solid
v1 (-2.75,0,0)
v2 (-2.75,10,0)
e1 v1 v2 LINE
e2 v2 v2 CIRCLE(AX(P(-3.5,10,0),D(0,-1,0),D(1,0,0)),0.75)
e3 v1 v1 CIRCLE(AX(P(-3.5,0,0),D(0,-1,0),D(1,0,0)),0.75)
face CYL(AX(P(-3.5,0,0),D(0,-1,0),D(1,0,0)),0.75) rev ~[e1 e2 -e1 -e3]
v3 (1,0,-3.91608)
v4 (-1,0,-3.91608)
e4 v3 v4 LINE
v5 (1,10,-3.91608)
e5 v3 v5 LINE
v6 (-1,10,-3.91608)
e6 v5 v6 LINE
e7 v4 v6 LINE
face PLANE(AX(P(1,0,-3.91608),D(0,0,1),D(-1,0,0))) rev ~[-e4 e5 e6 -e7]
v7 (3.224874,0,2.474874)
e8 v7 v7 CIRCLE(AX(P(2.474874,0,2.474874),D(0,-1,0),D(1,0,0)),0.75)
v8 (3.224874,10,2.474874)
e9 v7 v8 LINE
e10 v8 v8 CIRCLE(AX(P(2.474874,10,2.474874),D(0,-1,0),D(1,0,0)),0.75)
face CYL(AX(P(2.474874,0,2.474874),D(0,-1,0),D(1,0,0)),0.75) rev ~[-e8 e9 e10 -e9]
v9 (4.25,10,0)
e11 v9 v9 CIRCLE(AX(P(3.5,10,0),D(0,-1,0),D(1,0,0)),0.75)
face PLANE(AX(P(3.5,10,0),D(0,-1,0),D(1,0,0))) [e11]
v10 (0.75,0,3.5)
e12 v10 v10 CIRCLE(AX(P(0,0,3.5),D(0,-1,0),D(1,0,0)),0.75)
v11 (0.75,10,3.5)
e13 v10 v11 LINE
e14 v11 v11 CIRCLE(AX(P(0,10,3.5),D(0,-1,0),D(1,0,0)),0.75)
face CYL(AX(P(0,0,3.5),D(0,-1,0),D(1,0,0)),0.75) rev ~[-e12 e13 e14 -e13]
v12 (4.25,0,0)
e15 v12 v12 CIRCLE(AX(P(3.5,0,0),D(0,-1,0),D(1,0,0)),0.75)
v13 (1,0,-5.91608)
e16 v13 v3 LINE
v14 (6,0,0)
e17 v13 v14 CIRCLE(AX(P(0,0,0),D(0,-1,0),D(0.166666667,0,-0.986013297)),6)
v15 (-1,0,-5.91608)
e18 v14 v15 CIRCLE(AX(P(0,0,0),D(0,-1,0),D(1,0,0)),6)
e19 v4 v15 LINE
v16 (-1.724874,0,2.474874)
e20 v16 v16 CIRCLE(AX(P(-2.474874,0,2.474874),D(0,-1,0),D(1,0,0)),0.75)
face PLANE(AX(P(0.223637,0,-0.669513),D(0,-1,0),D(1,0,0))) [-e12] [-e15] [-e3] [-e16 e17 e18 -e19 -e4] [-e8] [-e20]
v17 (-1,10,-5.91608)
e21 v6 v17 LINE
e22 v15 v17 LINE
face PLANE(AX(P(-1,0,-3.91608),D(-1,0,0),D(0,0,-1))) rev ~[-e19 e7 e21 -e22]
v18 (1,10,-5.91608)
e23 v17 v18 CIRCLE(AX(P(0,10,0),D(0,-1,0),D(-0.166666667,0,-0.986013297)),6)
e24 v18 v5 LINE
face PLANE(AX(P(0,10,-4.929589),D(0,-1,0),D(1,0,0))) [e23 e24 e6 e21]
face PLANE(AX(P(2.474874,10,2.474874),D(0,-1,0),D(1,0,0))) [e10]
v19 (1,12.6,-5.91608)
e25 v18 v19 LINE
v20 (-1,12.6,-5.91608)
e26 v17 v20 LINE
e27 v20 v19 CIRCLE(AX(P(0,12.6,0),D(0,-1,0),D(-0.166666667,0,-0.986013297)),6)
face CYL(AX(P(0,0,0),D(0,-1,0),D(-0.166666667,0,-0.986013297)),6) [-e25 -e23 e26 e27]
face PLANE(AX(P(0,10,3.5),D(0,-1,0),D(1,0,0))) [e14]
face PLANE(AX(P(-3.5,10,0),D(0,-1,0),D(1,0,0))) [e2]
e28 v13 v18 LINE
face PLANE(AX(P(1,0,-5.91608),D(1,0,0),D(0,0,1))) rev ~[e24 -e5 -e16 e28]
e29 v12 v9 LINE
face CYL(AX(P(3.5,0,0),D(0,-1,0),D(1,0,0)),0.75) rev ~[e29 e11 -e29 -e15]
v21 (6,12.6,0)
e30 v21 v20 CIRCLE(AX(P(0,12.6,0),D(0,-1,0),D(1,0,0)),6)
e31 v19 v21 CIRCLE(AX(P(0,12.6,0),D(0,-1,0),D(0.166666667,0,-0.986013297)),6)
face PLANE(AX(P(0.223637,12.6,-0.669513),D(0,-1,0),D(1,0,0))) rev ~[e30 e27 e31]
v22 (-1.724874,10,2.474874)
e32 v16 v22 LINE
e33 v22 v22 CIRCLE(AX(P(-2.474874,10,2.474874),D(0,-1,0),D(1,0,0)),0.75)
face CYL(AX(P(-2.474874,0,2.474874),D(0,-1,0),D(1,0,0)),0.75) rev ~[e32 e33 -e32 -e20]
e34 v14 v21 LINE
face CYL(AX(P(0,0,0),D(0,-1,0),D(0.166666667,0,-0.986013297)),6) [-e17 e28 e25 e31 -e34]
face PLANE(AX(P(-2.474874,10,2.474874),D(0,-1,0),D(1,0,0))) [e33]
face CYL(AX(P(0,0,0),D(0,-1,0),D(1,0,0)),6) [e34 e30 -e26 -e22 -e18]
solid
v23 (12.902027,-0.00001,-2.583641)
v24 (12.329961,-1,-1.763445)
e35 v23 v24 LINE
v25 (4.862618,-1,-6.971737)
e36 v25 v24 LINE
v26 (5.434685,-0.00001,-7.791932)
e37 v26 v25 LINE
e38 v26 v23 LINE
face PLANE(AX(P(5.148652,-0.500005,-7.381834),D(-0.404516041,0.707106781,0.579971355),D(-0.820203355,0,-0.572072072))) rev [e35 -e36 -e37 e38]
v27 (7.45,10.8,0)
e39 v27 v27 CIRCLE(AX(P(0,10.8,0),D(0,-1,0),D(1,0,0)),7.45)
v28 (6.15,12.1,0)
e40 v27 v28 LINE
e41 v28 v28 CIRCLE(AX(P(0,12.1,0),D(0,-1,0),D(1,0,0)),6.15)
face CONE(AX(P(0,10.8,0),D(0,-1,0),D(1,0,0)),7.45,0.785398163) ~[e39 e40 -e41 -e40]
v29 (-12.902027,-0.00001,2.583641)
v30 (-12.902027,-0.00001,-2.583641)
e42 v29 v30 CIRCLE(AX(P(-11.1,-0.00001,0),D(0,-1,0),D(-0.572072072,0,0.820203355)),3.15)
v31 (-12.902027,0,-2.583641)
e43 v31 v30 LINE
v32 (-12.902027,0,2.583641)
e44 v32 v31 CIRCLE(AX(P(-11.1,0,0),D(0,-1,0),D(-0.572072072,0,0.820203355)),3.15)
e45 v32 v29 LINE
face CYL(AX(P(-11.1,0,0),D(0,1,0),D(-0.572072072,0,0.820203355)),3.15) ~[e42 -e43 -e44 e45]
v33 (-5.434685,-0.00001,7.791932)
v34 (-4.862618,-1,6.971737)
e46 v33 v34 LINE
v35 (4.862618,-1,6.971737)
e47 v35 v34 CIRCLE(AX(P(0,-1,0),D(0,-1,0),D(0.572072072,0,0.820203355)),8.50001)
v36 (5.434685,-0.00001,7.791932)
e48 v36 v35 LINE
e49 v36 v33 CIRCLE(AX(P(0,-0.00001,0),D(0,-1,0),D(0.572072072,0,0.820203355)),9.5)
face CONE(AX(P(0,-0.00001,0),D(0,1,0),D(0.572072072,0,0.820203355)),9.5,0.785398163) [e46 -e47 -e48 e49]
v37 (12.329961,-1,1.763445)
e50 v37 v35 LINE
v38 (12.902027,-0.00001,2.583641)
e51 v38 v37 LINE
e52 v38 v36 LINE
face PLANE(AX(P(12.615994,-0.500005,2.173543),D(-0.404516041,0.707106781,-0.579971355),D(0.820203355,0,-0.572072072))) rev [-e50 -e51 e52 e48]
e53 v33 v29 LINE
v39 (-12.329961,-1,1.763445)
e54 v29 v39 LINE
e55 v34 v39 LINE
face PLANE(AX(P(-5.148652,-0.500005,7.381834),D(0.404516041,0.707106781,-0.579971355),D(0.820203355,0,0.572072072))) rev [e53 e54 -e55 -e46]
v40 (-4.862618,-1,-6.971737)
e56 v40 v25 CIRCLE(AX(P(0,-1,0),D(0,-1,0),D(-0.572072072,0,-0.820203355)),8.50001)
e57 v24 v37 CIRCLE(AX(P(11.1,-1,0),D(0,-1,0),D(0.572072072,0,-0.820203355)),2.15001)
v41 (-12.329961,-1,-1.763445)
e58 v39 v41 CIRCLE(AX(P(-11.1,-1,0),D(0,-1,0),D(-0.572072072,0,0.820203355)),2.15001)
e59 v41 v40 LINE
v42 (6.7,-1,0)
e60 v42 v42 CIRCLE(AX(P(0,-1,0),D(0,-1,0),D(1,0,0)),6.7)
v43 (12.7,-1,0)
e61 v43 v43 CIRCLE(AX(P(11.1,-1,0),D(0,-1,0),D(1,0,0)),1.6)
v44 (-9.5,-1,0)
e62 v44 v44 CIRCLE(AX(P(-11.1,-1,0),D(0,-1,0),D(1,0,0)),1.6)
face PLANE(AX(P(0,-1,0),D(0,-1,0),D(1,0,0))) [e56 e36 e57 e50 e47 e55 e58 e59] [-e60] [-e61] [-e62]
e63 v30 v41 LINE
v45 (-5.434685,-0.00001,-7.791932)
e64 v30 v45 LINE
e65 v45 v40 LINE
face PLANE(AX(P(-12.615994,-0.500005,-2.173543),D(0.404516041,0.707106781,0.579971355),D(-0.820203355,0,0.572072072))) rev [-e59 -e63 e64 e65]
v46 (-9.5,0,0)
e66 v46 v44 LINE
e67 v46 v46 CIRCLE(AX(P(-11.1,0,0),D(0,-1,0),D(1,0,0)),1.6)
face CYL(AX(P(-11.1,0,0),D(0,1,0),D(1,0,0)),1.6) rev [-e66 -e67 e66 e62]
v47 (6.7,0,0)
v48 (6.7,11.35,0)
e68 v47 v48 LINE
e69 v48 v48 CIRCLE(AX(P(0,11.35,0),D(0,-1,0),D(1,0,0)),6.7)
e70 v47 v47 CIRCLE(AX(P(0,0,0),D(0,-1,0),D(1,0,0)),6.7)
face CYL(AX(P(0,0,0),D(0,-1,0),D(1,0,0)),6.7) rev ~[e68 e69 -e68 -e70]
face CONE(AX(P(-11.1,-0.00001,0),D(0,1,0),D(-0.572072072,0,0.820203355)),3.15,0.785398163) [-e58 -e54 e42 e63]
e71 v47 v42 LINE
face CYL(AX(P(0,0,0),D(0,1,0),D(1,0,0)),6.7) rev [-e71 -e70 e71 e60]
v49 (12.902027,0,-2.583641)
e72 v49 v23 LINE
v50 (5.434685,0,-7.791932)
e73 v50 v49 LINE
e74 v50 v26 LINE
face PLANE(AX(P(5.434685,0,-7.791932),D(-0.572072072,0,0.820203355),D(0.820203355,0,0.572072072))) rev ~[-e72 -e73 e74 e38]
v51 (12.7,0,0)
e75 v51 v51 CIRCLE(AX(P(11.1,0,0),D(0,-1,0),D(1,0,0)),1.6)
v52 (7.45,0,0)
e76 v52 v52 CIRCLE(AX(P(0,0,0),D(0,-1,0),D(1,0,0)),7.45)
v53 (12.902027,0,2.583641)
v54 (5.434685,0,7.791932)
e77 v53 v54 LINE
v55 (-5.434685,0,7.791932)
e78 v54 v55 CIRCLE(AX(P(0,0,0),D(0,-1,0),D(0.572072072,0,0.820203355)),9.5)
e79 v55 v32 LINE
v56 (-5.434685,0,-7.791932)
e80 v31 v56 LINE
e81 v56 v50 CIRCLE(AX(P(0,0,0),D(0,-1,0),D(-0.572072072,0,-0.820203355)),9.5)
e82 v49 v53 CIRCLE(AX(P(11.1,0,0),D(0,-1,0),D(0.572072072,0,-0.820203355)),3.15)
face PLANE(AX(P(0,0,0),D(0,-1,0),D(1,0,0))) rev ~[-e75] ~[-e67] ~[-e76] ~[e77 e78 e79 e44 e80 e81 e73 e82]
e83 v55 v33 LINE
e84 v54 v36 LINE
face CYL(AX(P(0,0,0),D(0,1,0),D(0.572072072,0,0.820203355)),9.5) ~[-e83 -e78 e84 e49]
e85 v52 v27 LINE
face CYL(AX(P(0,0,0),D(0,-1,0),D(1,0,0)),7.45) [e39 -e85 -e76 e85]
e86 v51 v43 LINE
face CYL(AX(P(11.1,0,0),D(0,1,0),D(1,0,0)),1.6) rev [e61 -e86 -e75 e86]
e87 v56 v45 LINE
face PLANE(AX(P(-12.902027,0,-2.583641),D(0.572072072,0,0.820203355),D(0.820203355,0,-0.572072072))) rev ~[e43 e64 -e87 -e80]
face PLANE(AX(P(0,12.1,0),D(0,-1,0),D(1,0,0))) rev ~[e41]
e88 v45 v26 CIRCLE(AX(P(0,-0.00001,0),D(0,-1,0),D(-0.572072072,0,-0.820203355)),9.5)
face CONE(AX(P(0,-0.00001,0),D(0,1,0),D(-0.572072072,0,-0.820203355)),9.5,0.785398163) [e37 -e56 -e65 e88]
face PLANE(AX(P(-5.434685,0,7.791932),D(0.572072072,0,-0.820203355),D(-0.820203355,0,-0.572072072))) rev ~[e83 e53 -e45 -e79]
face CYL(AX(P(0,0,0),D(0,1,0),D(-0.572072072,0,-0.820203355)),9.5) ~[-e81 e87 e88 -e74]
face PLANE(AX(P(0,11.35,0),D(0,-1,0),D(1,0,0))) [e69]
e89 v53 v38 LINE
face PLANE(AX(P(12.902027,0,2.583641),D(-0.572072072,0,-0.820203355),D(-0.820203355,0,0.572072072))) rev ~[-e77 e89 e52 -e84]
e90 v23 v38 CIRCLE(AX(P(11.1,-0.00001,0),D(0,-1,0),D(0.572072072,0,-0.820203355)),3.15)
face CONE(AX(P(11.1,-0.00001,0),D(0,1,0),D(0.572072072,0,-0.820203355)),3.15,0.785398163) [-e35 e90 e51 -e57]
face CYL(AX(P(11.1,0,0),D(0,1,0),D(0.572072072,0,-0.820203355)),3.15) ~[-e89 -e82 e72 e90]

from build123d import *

# Parameters (mm, degrees)
F0_R     = 1.6
F0_R_2   = 7.45
F0_R_3   = 6.7
F1_DEPTH = 1
F2_SIZE  = 0.99999
F0_R_4   = 0.75
F3_DEPTH = 12.1
F4_T     = 0.75
F5_DEPTH = 12.6
F6_DEPTH = 10
F7_SIZE  = 1.3


# Not quite as in the source:
# - a fillet or chamfer is up to 0.001 mm smaller than in the source, because OpenCascade refuses the exact size
# - a shell that OpenCascade refuses in one call is made with other operations: the cavity is built on its own and cut out


with BuildPart() as f1:
    # F0 (on Front) → F1 (new body)
    with BuildSketch(Plane.XZ):
        with BuildLine():
            Line((-5.4346846847, 7.7919318771), (-12.902027027, 2.5836405698))
            ThreePointArc((-12.902027027, 2.5836405698), (-14.25, 0), (-12.902027027, -2.5836405698))
            Line((-12.902027027, -2.5836405698), (-5.4346846847, -7.7919318771))
            ThreePointArc((-5.4346846847, -7.7919318771), (0, -9.5), (5.4346846847, -7.7919318771))
            Line((5.4346846847, -7.7919318771), (12.902027027, -2.5836405698))
            ThreePointArc((12.902027027, -2.5836405698), (14.25, 0), (12.902027027, 2.5836405698))
            Line((12.902027027, 2.5836405698), (5.4346846847, 7.7919318771))
            ThreePointArc((5.4346846847, 7.7919318771), (0, 9.5), (-5.4346846847, 7.7919318771))
        make_face()
        with Locations((-11.1, 0)):
            Circle(F0_R, mode=Mode.SUBTRACT)
        Circle(F0_R_2, mode=Mode.SUBTRACT)
        with Locations((11.1, 0)):
            Circle(F0_R, mode=Mode.SUBTRACT)
        Circle(F0_R_2)
        Circle(F0_R_3, mode=Mode.SUBTRACT)
    extrude(amount=F1_DEPTH)

    # F2 (size 1 in the source; OpenCascade refuses exactly that, so slightly less here)
    f2_edges = [f1.edges().sort_by_distance(p)[0] for p in [
        (-9.168356, -1, 5.187786),
        (0, -1, 9.5),
        (-14.25, -1, 0),
        (-9.168356, -1, -5.187786),
        (0, -1, -9.5),
        (9.168356, -1, -5.187786),
        (14.25, -1, 0),
        (9.168356, -1, 5.187786),
    ]]
    chamfer(f2_edges, length=F2_SIZE)

    # F0 (on Front) → F3 (join)
    with BuildSketch(Plane.XZ):
        Circle(F0_R_2)
        Circle(F0_R_3, mode=Mode.SUBTRACT)
        Circle(F0_R_3)
        with BuildLine():
            ThreePointArc((-1, -5.9160797831), (-3.8729833462, 4.582575695), (6, 0))
            ThreePointArc((6, 0), (4.582575695, -3.8729833462), (1, -5.9160797831))
            Line((1, -5.9160797831), (1, -6.3300160691))
            Line((1, -6.3300160691), (-1, -6.3300160691))
            Line((-1, -6.3300160691), (-1, -5.9160797831))
        make_face(mode=Mode.SUBTRACT)
        with BuildLine():
            ThreePointArc((1, -5.9160797831), (4.582575695, -3.8729833462), (6, 0))
            ThreePointArc((6, 0), (-3.8729833462, 4.582575695), (-1, -5.9160797831))
            Line((-1, -5.9160797831), (-1, -3.9160797831))
            Line((-1, -3.9160797831), (0, -3.9160797831))
            Line((0, -3.9160797831), (1, -3.9160797831))
            Line((1, -3.9160797831), (1, -5.9160797831))
        make_face()
        with Locations((-3.5, 0)):
            Circle(F0_R_4, mode=Mode.SUBTRACT)
        with Locations((-2.4748737342, 2.4748737342)):
            Circle(F0_R_4, mode=Mode.SUBTRACT)
        with Locations((3.5, 0)):
            Circle(F0_R_4, mode=Mode.SUBTRACT)
        with Locations((0, 3.5)):
            Circle(F0_R_4, mode=Mode.SUBTRACT)
        with Locations((2.4748737342, 2.4748737342)):
            Circle(F0_R_4, mode=Mode.SUBTRACT)
        with Locations((-3.5, 0)):
            Circle(F0_R_4)
        with Locations((-2.4748737342, 2.4748737342)):
            Circle(F0_R_4)
        with Locations((0, 3.5)):
            Circle(F0_R_4)
        with Locations((2.4748737342, 2.4748737342)):
            Circle(F0_R_4)
        with Locations((3.5, 0)):
            Circle(F0_R_4)
        with BuildLine():
            Line((-1, -3.9160797831), (-1, -5.9160797831))
            ThreePointArc((-1, -5.9160797831), (0, -6), (1, -5.9160797831))
            Line((1, -5.9160797831), (1, -3.9160797831))
            Line((1, -3.9160797831), (0, -3.9160797831))
            Line((0, -3.9160797831), (-1, -3.9160797831))
        make_face()
        with BuildLine():
            ThreePointArc((1, -5.9160797831), (0, -6), (-1, -5.9160797831))
            Line((-1, -5.9160797831), (-1, -6.3300160691))
            Line((-1, -6.3300160691), (1, -6.3300160691))
            Line((1, -6.3300160691), (1, -5.9160797831))
        make_face()
    extrude(amount=-F3_DEPTH)

    # F4: shell of thickness 0.75, made by hand


with BuildPart() as f4_core1:
    # F4_t2: copy of F1
    add(f1.part)

    # the walls: a layer under each face that stays
    f4_faces = [f4_core1.faces().sort_by_distance(p)[0] for p in [
        (0, -5e-06, 9.5),
        (9.1683558559, -5e-06, 5.1877862235),
        (0, -0.500005, 9.000005),
        (-12.2142857143, 0, -2.7142857143),
        (-9.1683558559, -5e-06, 5.1877862235),
        (14.25, -5e-06, 0),
        (8.8823226802, -0.500005, 4.7776886467),
        (-8.83334, -1, 0),
        (-8.8823226802, -0.500005, 4.7776886467),
        (-14.25, -5e-06, 0),
        (9.1683558559, -5e-06, -5.1877862235),
        (-9.1683558559, -5e-06, -5.1877862235),
        (0, -5e-06, -9.5),
        (-12.7, -0.5, 0),
        (-7.45, 6.05, 0),
        (9.5, -0.5, 0),
        (13.750005, -0.500005, 0),
        (-13.750005, -0.500005, 0),
        (-8.8823226802, -0.500005, -4.7776886467),
        (0, -0.500005, -9.000005),
        (8.8823226802, -0.500005, -4.7776886467),
        (-6.7, -0.5, 0),
        (0, 12.1, 0),
    ]]
    thicken(f4_faces, amount=-F4_T, mode=Mode.SUBTRACT)

    # F4_s3 → F4_t4 (revolve, cut)
    with BuildSketch(Plane.XY):
        Polygon((7.4575, 0.0075), (7.45, -0.75), (6.7, -0.75), (6.7, 0), align=None)
    revolve(axis=Axis((0, 0, 0), (0, -1, 0)), mode=Mode.SUBTRACT)


with BuildPart() as f1_1:
    add(f1.part)

    # what is left inside the walls is the cavity
    f4_cavity = [f4_core1.part.solids().sort_by_distance(p)[0] for p in [
        (-6.6925, 7.566667, 0),
    ]]
    add(f4_cavity, mode=Mode.SUBTRACT)

    # F7
    f7_edges = [f1_1.edges().sort_by_distance(p)[0] for p in [
        (-7.45, 12.1, 0),
    ]]
    chamfer(f7_edges, length=F7_SIZE)


with BuildPart() as f5:
    # F0 (on Front) → F5 (new body)
    with BuildSketch(Plane.XZ):
        with BuildLine():
            ThreePointArc((1, -5.9160797831), (4.582575695, -3.8729833462), (6, 0))
            ThreePointArc((6, 0), (-3.8729833462, 4.582575695), (-1, -5.9160797831))
            Line((-1, -5.9160797831), (-1, -3.9160797831))
            Line((-1, -3.9160797831), (0, -3.9160797831))
            Line((0, -3.9160797831), (1, -3.9160797831))
            Line((1, -3.9160797831), (1, -5.9160797831))
        make_face()
        with Locations((-3.5, 0)):
            Circle(F0_R_4, mode=Mode.SUBTRACT)
        with Locations((-2.4748737342, 2.4748737342)):
            Circle(F0_R_4, mode=Mode.SUBTRACT)
        with Locations((3.5, 0)):
            Circle(F0_R_4, mode=Mode.SUBTRACT)
        with Locations((0, 3.5)):
            Circle(F0_R_4, mode=Mode.SUBTRACT)
        with Locations((2.4748737342, 2.4748737342)):
            Circle(F0_R_4, mode=Mode.SUBTRACT)
        with Locations((-3.5, 0)):
            Circle(F0_R_4)
        with Locations((-2.4748737342, 2.4748737342)):
            Circle(F0_R_4)
        with Locations((0, 3.5)):
            Circle(F0_R_4)
        with Locations((2.4748737342, 2.4748737342)):
            Circle(F0_R_4)
        with Locations((3.5, 0)):
            Circle(F0_R_4)
        with BuildLine():
            Line((-1, -3.9160797831), (-1, -5.9160797831))
            ThreePointArc((-1, -5.9160797831), (0, -6), (1, -5.9160797831))
            Line((1, -5.9160797831), (1, -3.9160797831))
            Line((1, -3.9160797831), (0, -3.9160797831))
            Line((0, -3.9160797831), (-1, -3.9160797831))
        make_face()
    extrude(amount=-F5_DEPTH)

    # F0 (on Front) → F6 (cut)
    with BuildSketch(Plane.XZ):
        with Locations((-3.5, 0)):
            Circle(F0_R_4)
        with BuildLine():
            Line((-1, -3.9160797831), (-1, -5.9160797831))
            ThreePointArc((-1, -5.9160797831), (0, -6), (1, -5.9160797831))
            Line((1, -5.9160797831), (1, -3.9160797831))
            Line((1, -3.9160797831), (0, -3.9160797831))
            Line((0, -3.9160797831), (-1, -3.9160797831))
        make_face()
        with Locations((-2.4748737342, 2.4748737342)):
            Circle(F0_R_4)
        with Locations((0, 3.5)):
            Circle(F0_R_4)
        with Locations((2.4748737342, 2.4748737342)):
            Circle(F0_R_4)
        with Locations((3.5, 0)):
            Circle(F0_R_4)
    extrude(amount=-F6_DEPTH, mode=Mode.SUBTRACT)


solid = Compound([f1_1.part, f5.part])
